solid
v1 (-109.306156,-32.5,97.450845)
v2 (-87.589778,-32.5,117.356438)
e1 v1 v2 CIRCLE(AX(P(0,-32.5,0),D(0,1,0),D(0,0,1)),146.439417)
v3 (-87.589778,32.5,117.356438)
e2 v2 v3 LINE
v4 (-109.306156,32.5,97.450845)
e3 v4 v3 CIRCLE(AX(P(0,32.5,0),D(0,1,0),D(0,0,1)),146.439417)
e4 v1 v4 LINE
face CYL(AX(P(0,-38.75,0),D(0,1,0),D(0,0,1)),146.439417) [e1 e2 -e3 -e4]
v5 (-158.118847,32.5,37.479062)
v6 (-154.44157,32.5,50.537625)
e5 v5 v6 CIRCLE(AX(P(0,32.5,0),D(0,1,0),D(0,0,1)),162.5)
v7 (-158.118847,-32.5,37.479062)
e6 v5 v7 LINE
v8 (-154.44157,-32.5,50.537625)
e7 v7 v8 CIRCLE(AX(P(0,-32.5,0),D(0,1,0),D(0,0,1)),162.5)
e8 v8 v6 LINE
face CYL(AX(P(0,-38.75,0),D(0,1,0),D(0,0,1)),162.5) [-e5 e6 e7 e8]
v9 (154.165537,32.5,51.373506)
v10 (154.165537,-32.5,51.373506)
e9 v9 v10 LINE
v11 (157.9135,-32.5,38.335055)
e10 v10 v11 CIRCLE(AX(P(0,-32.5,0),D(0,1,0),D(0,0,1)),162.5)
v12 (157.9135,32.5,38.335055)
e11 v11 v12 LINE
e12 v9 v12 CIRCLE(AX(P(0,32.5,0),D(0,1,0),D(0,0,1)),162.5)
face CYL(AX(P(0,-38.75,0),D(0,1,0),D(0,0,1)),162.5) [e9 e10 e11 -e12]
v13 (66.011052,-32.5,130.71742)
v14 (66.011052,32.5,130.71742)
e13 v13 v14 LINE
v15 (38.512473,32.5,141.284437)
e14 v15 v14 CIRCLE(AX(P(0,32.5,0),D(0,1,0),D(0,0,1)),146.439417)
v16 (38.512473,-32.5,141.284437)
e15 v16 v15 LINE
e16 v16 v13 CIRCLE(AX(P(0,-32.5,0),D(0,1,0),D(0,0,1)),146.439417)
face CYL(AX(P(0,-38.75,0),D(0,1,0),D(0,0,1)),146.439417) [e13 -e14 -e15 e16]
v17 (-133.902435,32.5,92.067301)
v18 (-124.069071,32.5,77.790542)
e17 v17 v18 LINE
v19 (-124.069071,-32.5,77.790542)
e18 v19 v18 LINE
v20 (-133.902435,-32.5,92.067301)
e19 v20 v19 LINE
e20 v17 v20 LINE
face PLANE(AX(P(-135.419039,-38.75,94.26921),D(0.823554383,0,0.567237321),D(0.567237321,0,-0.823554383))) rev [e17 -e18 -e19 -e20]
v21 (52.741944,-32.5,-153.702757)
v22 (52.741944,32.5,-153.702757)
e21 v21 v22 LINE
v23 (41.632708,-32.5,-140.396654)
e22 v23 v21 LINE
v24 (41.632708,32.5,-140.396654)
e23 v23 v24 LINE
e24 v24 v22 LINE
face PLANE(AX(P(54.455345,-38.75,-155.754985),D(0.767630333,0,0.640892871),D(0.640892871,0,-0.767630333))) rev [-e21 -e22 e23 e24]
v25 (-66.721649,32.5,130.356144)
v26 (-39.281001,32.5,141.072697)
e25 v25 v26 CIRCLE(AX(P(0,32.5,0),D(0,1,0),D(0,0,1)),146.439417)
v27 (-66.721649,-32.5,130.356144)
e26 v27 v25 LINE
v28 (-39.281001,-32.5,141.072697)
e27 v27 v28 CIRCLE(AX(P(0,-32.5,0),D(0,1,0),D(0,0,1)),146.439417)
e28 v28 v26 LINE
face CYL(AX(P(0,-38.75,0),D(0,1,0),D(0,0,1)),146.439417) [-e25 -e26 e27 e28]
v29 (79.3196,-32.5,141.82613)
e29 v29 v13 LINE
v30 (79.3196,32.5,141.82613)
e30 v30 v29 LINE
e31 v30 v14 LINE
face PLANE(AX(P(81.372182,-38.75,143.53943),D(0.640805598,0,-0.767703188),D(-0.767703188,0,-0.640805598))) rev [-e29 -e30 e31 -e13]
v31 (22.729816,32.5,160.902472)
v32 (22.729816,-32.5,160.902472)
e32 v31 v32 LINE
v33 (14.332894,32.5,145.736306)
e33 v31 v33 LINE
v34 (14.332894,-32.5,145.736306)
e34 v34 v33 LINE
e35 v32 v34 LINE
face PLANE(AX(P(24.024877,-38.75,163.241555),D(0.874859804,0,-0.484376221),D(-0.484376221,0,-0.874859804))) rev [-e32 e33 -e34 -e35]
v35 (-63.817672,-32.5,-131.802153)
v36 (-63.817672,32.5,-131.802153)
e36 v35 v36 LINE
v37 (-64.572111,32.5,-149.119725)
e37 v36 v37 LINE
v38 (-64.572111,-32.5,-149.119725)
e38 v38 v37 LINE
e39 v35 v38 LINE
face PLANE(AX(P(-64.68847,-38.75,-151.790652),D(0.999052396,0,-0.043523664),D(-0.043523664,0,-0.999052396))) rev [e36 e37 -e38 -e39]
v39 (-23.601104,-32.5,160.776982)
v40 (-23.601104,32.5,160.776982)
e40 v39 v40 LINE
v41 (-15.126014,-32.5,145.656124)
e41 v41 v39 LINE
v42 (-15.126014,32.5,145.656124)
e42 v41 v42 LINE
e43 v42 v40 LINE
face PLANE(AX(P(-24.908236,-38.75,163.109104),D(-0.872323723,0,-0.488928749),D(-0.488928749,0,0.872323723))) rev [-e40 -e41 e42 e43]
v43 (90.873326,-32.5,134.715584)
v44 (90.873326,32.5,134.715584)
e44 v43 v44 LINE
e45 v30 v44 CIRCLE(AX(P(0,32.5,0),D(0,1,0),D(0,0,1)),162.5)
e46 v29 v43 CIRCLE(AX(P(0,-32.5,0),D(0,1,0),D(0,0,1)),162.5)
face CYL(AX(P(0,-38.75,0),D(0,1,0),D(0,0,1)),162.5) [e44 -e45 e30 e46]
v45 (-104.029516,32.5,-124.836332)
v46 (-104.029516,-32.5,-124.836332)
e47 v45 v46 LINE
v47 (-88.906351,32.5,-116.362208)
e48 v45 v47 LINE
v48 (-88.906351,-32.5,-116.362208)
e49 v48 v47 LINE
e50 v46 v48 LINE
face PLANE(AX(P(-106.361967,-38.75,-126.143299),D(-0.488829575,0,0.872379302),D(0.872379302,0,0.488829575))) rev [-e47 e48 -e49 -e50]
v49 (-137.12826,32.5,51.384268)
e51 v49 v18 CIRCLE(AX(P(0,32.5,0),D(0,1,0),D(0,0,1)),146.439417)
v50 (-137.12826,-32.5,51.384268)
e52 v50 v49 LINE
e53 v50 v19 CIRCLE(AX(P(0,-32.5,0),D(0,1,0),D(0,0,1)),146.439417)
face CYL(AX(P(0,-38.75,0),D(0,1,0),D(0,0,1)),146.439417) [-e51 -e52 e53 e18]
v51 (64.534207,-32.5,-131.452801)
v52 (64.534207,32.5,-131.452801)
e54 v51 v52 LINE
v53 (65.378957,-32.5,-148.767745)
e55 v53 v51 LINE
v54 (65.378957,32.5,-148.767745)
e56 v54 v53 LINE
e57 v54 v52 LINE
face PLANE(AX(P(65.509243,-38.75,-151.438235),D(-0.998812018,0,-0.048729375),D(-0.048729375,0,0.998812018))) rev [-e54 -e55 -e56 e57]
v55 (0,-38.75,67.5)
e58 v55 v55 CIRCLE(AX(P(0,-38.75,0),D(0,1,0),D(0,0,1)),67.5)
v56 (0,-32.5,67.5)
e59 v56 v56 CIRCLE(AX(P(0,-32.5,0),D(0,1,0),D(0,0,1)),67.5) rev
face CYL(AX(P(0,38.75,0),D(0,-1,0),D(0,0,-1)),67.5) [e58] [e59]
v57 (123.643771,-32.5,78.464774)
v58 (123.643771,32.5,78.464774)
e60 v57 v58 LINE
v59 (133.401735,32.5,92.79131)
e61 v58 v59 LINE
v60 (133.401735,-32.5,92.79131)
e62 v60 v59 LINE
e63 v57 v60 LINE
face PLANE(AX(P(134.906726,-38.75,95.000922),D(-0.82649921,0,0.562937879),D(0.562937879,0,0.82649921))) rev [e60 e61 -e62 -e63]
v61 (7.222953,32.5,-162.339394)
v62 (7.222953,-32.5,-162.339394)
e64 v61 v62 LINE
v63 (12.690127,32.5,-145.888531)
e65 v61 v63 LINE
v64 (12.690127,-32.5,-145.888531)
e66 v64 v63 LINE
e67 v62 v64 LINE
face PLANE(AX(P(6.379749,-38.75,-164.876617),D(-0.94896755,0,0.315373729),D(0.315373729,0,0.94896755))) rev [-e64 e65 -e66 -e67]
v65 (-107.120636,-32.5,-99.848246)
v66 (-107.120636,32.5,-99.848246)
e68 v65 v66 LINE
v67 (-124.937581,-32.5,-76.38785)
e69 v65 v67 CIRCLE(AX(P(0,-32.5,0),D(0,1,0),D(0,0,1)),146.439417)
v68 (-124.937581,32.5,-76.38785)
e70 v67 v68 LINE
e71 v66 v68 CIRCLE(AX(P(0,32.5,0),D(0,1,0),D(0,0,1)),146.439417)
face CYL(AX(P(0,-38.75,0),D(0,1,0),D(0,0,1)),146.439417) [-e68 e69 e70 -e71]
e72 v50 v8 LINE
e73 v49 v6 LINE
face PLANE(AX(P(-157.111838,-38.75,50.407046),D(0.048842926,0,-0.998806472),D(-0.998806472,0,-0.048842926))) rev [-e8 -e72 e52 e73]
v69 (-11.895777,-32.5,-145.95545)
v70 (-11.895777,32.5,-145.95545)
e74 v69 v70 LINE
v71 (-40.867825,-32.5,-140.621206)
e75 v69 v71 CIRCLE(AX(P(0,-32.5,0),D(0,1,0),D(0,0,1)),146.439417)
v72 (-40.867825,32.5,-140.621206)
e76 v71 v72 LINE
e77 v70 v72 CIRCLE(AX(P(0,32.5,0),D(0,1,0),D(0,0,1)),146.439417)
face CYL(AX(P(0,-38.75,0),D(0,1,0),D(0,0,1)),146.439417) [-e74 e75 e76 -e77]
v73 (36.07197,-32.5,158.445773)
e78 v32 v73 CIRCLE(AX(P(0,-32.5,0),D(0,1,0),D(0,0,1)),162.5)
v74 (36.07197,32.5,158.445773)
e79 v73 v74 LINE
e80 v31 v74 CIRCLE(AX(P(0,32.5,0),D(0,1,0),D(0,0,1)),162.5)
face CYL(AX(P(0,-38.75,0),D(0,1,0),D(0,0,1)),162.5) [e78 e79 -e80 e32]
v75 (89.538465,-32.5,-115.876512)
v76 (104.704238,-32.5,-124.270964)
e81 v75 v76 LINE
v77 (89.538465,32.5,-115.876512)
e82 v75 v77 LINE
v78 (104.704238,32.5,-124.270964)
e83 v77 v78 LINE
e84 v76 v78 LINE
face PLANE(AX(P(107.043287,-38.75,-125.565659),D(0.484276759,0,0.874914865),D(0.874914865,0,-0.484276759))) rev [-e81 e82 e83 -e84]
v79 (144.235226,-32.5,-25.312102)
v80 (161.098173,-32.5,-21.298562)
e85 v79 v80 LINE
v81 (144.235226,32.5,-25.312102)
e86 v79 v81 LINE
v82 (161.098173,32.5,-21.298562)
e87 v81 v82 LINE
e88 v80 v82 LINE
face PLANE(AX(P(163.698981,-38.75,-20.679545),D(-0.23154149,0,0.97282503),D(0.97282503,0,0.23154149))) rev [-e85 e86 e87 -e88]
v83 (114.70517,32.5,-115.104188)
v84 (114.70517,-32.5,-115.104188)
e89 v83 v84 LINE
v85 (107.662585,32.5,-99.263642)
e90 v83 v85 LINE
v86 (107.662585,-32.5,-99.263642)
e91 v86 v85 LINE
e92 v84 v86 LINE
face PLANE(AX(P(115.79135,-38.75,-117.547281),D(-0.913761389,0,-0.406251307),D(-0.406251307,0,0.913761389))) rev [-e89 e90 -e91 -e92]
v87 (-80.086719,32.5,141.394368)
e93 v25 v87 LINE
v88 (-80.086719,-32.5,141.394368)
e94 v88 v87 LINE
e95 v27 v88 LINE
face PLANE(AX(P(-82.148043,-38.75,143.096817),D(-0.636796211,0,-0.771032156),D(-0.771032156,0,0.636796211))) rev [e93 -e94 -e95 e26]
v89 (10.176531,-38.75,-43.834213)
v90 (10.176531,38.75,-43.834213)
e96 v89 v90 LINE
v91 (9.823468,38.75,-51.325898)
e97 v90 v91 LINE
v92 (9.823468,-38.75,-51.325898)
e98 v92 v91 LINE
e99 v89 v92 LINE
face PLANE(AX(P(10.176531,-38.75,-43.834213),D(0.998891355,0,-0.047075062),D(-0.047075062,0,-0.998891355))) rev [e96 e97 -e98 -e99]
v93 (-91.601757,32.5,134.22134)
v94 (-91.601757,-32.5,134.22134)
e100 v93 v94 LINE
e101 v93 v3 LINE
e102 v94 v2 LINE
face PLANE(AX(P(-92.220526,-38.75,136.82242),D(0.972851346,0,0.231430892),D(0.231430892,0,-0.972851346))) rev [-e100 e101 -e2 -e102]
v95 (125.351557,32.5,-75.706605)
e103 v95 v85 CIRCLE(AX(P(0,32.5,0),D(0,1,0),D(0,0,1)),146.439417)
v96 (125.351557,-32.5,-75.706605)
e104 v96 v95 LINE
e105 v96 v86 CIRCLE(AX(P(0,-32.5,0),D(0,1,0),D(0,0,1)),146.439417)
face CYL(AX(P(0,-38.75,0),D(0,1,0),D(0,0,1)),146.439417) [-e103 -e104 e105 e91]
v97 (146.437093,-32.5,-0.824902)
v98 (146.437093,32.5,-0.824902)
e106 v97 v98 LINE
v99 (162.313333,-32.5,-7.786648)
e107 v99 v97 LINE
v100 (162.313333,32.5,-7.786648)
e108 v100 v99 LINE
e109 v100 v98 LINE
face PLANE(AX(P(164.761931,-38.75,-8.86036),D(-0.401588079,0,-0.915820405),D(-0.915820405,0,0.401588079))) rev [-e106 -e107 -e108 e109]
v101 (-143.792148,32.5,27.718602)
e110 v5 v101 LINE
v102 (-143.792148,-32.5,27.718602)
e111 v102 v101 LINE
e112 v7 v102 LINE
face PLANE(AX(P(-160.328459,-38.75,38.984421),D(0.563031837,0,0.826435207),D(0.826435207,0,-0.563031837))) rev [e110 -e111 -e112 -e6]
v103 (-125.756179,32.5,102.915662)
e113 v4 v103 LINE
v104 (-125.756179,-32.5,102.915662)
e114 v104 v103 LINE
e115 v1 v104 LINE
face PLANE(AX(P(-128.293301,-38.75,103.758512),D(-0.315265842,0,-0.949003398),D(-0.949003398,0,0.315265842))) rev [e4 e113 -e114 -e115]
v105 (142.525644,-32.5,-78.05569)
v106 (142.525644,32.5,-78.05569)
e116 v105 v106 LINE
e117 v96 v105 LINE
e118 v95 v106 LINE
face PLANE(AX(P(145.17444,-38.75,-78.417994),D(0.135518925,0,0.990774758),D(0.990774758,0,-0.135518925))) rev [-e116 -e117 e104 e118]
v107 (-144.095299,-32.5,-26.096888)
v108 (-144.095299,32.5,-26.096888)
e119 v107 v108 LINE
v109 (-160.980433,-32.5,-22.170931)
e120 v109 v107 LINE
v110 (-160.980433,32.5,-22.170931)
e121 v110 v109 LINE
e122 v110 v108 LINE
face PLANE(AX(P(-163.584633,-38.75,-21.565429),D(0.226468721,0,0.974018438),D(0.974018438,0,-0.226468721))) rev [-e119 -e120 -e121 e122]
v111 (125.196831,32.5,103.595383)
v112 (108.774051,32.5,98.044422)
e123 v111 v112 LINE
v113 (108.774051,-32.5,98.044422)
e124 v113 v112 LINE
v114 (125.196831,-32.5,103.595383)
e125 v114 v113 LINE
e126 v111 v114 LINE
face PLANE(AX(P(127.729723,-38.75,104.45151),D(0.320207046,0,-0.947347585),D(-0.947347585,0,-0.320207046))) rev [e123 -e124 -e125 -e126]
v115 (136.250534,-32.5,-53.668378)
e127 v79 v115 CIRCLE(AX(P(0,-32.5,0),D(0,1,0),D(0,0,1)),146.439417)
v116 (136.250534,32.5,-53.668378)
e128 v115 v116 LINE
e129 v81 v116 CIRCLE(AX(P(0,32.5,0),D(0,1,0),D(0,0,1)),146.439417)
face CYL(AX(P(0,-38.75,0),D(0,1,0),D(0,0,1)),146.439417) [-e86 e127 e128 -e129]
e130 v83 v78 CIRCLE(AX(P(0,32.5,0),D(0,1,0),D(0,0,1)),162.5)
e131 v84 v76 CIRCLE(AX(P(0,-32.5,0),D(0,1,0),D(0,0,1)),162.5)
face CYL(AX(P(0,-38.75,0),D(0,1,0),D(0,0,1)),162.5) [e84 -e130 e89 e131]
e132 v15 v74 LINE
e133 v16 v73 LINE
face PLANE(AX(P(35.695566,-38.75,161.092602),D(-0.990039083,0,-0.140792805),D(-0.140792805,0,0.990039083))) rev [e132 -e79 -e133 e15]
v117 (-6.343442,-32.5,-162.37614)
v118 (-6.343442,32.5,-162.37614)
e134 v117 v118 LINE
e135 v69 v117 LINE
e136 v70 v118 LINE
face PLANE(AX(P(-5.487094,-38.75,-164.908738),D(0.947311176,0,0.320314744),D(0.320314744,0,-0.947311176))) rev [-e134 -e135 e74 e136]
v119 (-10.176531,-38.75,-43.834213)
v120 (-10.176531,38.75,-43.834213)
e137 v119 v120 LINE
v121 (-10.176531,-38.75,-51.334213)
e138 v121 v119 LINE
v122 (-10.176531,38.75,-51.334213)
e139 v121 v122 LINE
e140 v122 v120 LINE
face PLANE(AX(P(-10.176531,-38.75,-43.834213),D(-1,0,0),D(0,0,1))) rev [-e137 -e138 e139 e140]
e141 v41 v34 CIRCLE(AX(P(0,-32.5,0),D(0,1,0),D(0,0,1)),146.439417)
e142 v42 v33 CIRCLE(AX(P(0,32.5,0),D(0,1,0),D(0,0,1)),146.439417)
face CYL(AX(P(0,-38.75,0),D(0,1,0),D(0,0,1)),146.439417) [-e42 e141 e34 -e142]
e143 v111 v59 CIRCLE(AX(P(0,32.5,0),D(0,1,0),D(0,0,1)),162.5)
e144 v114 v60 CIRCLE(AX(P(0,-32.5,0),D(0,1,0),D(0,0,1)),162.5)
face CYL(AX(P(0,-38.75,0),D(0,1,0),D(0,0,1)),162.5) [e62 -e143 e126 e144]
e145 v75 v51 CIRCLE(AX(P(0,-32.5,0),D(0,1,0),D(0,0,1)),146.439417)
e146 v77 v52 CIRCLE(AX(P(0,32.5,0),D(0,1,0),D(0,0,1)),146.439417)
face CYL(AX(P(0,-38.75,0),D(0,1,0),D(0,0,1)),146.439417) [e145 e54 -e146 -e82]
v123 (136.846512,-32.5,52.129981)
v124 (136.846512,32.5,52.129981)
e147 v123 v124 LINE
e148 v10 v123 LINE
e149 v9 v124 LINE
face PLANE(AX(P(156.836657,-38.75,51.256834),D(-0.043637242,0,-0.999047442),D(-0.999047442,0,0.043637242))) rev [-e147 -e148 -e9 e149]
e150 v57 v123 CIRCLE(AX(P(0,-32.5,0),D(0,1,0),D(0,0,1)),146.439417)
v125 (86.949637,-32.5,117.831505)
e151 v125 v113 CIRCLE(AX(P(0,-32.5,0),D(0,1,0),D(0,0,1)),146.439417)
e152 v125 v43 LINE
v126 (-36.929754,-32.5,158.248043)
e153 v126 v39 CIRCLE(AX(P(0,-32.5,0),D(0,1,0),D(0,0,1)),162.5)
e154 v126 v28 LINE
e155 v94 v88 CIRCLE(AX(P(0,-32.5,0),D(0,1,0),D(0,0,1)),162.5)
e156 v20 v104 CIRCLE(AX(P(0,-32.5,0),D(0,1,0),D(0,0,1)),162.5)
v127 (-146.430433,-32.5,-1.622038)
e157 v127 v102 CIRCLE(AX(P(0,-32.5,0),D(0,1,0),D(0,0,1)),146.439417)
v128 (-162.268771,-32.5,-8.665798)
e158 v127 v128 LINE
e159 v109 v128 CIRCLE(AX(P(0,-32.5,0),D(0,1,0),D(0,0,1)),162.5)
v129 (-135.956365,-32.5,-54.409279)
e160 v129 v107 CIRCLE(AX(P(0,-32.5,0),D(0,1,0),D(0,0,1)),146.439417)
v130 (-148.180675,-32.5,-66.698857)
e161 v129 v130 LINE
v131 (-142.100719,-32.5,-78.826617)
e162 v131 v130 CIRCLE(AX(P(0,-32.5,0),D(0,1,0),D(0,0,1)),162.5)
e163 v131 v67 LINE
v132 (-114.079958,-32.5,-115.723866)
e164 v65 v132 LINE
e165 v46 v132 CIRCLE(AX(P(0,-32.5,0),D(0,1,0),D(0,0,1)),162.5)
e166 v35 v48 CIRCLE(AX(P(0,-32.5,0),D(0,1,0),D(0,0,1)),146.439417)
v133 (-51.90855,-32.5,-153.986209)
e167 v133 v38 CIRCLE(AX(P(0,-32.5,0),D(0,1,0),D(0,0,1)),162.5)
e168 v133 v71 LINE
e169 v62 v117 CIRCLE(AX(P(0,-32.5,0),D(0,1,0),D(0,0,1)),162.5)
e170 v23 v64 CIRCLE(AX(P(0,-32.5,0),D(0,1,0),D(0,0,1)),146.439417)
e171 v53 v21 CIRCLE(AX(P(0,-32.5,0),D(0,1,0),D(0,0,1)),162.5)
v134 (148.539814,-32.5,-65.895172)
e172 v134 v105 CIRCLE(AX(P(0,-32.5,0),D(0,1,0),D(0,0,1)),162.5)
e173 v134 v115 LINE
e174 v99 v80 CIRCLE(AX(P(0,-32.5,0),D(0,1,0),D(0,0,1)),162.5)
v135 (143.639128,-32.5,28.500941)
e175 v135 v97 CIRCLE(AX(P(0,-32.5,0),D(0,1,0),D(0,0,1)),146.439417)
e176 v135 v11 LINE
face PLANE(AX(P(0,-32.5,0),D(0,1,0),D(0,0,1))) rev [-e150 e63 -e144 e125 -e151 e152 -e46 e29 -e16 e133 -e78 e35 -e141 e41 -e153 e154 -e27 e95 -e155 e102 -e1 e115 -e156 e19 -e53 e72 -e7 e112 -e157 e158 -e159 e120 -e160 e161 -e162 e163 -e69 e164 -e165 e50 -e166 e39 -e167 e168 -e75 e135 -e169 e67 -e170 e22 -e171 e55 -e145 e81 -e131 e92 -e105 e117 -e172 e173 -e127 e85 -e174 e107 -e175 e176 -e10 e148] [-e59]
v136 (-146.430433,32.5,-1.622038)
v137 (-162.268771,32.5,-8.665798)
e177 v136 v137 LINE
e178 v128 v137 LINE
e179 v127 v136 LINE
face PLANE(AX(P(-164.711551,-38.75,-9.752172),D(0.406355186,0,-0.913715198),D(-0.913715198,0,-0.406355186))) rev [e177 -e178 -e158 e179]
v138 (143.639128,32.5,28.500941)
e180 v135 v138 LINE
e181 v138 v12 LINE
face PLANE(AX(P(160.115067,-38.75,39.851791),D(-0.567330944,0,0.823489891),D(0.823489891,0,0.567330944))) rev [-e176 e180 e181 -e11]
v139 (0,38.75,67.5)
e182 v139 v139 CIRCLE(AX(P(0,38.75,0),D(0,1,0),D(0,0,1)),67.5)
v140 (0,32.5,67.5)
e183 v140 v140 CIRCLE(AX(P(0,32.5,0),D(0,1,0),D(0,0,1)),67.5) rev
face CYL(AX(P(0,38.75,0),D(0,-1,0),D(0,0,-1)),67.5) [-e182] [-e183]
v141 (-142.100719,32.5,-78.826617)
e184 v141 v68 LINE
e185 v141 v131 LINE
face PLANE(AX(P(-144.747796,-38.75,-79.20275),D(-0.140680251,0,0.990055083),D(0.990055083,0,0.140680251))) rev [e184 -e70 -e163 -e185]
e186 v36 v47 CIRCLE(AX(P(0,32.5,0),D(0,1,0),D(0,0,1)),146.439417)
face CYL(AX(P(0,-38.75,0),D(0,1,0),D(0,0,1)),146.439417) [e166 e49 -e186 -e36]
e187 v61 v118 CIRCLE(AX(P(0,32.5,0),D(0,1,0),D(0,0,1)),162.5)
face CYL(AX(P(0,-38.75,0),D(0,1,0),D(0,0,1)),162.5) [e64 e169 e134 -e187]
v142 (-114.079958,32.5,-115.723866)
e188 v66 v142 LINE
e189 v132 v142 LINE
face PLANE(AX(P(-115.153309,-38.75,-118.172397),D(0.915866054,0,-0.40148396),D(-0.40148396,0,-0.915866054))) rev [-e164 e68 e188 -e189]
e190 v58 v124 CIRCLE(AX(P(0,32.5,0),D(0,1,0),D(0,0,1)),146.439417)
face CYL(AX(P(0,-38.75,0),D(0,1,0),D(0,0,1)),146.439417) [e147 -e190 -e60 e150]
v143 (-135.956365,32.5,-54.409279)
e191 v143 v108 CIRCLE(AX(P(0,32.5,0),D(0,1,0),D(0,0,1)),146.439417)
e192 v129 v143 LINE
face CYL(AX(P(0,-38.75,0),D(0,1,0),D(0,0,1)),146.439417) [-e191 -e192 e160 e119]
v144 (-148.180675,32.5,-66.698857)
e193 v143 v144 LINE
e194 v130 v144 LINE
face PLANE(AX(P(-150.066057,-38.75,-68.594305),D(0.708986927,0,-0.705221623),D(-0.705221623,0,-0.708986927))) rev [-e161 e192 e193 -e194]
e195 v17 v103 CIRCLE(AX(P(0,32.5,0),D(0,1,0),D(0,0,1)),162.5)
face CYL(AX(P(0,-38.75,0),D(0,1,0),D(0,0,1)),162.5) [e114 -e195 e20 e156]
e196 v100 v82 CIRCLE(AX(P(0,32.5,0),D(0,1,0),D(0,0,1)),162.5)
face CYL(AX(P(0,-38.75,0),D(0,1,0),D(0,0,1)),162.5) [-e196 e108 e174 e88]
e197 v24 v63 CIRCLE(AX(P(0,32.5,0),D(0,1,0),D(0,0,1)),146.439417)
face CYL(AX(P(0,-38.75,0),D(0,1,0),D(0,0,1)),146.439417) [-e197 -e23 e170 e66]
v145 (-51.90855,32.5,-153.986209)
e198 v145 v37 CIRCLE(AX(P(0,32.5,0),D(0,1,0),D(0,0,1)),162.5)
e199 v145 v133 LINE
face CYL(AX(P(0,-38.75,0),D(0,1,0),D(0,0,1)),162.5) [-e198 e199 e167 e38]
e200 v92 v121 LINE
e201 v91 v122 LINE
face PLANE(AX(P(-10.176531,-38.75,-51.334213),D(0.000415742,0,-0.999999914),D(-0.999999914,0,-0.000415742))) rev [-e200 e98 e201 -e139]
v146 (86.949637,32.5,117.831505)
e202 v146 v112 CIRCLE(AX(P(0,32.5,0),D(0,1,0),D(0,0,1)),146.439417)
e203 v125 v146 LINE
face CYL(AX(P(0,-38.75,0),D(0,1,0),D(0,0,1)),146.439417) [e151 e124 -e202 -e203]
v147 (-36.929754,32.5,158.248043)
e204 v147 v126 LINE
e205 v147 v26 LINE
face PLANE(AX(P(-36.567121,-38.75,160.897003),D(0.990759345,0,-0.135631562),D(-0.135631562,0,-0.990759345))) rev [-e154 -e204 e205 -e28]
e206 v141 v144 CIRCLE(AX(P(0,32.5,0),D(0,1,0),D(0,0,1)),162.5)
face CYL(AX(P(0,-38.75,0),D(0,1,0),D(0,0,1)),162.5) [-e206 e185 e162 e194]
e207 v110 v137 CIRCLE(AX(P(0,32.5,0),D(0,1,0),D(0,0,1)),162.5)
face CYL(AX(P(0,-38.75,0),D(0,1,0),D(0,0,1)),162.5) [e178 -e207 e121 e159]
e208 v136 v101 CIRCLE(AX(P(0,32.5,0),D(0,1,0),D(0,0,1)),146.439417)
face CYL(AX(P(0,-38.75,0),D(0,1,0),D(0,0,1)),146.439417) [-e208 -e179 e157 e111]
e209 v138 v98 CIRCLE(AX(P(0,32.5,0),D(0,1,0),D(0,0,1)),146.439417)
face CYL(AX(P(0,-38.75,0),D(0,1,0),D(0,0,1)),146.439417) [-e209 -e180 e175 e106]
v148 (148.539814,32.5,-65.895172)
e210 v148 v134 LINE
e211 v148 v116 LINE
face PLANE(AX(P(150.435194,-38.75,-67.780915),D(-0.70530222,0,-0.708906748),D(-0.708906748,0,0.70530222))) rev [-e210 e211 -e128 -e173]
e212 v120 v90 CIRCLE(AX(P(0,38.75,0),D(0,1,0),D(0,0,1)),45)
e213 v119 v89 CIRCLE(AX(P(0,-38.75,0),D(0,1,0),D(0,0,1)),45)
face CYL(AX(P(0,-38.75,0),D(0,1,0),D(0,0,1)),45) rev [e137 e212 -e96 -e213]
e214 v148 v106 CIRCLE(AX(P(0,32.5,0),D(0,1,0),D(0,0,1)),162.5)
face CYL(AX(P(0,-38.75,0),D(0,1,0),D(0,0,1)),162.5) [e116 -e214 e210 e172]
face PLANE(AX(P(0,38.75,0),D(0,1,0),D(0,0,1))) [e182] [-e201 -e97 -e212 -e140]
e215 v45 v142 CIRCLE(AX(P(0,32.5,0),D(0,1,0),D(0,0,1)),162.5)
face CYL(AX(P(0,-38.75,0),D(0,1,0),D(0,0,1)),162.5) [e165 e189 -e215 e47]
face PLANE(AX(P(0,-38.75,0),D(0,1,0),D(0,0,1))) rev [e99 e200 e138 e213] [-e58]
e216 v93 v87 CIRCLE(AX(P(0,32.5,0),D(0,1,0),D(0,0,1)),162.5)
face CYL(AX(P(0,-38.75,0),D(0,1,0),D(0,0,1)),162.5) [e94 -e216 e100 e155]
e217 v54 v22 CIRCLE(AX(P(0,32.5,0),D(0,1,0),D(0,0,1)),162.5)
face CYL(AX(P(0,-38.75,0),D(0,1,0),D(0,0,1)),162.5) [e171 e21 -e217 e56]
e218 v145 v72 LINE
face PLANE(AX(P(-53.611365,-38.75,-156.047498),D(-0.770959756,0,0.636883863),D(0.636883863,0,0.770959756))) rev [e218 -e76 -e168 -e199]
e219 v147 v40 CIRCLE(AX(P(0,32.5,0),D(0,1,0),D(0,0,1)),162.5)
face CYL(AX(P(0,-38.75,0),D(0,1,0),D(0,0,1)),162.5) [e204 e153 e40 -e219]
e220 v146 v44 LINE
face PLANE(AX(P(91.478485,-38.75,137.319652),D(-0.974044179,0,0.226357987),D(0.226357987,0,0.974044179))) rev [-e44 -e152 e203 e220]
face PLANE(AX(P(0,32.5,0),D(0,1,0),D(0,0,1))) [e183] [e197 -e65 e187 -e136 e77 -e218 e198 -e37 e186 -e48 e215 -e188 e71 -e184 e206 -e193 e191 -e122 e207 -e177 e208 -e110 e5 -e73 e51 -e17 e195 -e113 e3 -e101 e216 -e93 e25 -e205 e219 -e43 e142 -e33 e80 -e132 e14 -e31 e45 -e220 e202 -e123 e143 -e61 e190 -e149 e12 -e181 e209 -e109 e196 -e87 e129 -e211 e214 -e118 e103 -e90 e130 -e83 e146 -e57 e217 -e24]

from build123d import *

# Parameters (mm, degrees)
SKETCH3_R           = 165
BOSS_EXTRUDE1_DEPTH = 32.5
SKETCH5_R           = 67.5
BOSS_EXTRUDE2_DEPTH = 38.75
CUT_EXTRUDE1_DEPTH  = 77.5
CUT_EXTRUDE2_START  = -65
CUT_EXTRUDE2_DEPTH  = 65
CUT_EXTRUDE4_DEPTH  = 244.931170023
SKETCH10_R          = 165
SKETCH10_R_2        = 162.5
CUT_EXTRUDE5_DEPTH  = 244.819721335


# Read off the part's stored shape, not the designer's step: Cut-Extrude2
with BuildPart() as part:
    # Sketch3 → Boss-Extrude1 (new, symmetric)
    with BuildSketch(Plane(origin=(0, 0, 0), x_dir=(1, 0, 0), z_dir=(0, 1, 0))):
        with Locations(Location((0, 0, 0), (0, 0, 270))):
            Circle(SKETCH3_R)
    extrude(amount=BOSS_EXTRUDE1_DEPTH, both=True)

    # Sketch5 → Boss-Extrude2 (add, symmetric)
    with BuildSketch(Plane(origin=(0, 0, 0), x_dir=(1, 0, 0), z_dir=(0, 1, 0))):
        with Locations(Location((0, 0, 0), (0, 0, 270))):
            Circle(SKETCH5_R)
    extrude(amount=BOSS_EXTRUDE2_DEPTH, both=True)

    # Sketch6 → Cut-Extrude1 (cut)
    with BuildSketch(Plane(origin=(0, 38.75, 0), x_dir=(1, 0, 0), z_dir=(0, 1, 0))):
        with BuildLine():
            Line((-10.176530617, 43.834212946), (-10.176530617, 51.334212946))
            Line((-10.176530617, 51.334212946), (9.823467655, 51.325898107))
            Line((9.823467655, 51.325898107), (10.176530617, 43.834212946))
            ThreePointArc((10.176530617, 43.834212946), (0, -45), (-10.176530617, 43.834212946))
        make_face()
    extrude(amount=-CUT_EXTRUDE1_DEPTH, mode=Mode.SUBTRACT)

    # Cut-Extrude2 outline → Cut-Extrude2 (cut)
    with BuildSketch(Plane(origin=(0, 32.5, 0), x_dir=(1, 0, 0), z_dir=(0, 1, 0)).offset(CUT_EXTRUDE2_START)):
        with BuildLine():
            ThreePointArc((-144.901893855, -21.164686614), (-145.807749666, -13.586866441), (-146.317587116, -5.972143919))
            Line((-146.317587116, -5.972143919), (-164.906164085, 5.563905713))
            ThreePointArc((-164.906164085, 5.563905713), (-164.325820919, -14.900489227), (-161.215685462, -35.135491472))
            Line((-161.215685462, -35.135491472), (-144.901893855, -21.164686614))
        make_face()
        with BuildLine():
            ThreePointArc((-151.760503896, 64.759165043), (-158.611942136, 45.467040938), (-163.021553119, 25.474952768))
            Line((-163.021553119, 25.474952768), (-142.762558665, 32.609119058))
            ThreePointArc((-142.762558665, 32.609119058), (-140.869819667, 40.002458791), (-138.594473879, 47.287150608))
            Line((-138.594473879, 47.287150608), (-151.760503896, 64.759165043))
        make_face()
        with BuildLine():
            Line((-134.279699439, -58.424867317), (-155.780333037, -54.382789914))
            ThreePointArc((-155.780333037, -54.382789914), (-147.846587026, -73.255625755), (-137.636746156, -91.000692896))
            Line((-137.636746156, -91.000692896), (-127.471425351, -72.080084082))
            ThreePointArc((-127.471425351, -72.080084082), (-131.053535124, -65.341210074), (-134.279699439, -58.424867317))
        make_face()
        with BuildLine():
            ThreePointArc((-118.118746723, 115.208340291), (-131.476641669, 99.693995283), (-142.810456694, 82.644863475))
            Line((-142.810456694, 82.644863475), (-121.342348853, 81.978882508))
            ThreePointArc((-121.342348853, 81.978882508), (-116.906639936, 88.189230302), (-112.153408966, 94.160053418))
            Line((-112.153408966, 94.160053418), (-118.118746723, 115.208340291))
        make_face()
        with BuildLine():
            Line((-104.106594283, -102.98698864), (-125.615504804, -106.984788418))
            ThreePointArc((-125.615504804, -106.984788418), (-111.399852309, -121.717184101), (-95.46920161, -134.575746492))
            Line((-95.46920161, -134.575746492), (-92.82523451, -113.260666785))
            ThreePointArc((-92.82523451, -113.260666785), (-98.59981447, -108.270861218), (-104.106594283, -102.98698864))
        make_face()
        with BuildLine():
            ThreePointArc((-68.524398286, 150.097990791), (-86.584692207, 140.45672314), (-103.312016753, 128.653127418))
            Line((-103.312016753, 128.653127418), (-83.534182446, 120.276943615))
            ThreePointArc((-83.534182446, 120.276943615), (-77.154570678, 124.465557588), (-70.565404709, 128.316119255))
            Line((-70.565404709, 128.316119255), (-68.524398286, 150.097990791))
        make_face()
        with BuildLine():
            Line((-59.873316695, -133.640146477), (-78.485606588, -145.137898423))
            ThreePointArc((-78.485606588, -145.137898423), (-59.90795025, -153.740162277), (-40.408012374, -159.975599814))
            Line((-40.408012374, -159.975599814), (-45.642481386, -139.144768839))
            ThreePointArc((-45.642481386, -139.144768839), (-52.829642513, -136.577932604), (-59.873316695, -133.640146477))
        make_face()
        with BuildLine():
            ThreePointArc((-9.675450153, 164.716075913), (-29.99900028, 162.249992241), (-49.860716477, 157.286073612))
            Line((-49.860716477, 157.286073612), (-34.444261822, 142.330937009))
            ThreePointArc((-34.444261822, 142.330937009), (-26.982349124, 143.932121634), (-19.44715153, 145.142382162))
            Line((-19.44715153, 145.142382162), (-9.675450153, 164.716075913))
        make_face()
        with BuildLine():
            Line((-7.553815918, -146.244462006), (-20.755792298, -163.689331009))
            ThreePointArc((-20.755792298, -163.689331009), (-0.325147548, -164.999679633), (20.110502842, -163.769861927))
            Line((20.110502842, -163.769861927), (7.704541763, -146.236598834))
            ThreePointArc((7.704541763, -146.236598834), (0.075465406, -146.439397388), (-7.553815918, -146.244462006))
        make_face()
        with BuildLine():
            ThreePointArc((50.480221136, 157.08834226), (30.638222865, 162.130500831), (10.324549847, 164.676664013))
            Line((10.324549847, 164.676664013), (19.297547224, 145.162348677))
            ThreePointArc((19.297547224, 145.162348677), (26.833988195, 143.959855098), (34.297547224, 142.366362097))
            Line((34.297547224, 142.366362097), (50.480221136, 157.08834226))
        make_face()
        with BuildLine():
            Line((45.785869556, -139.097652573), (39.777206754, -160.133612408))
            ThreePointArc((39.777206754, -160.133612408), (59.301568133, -153.97507596), (77.912983213, -145.446096705))
            Line((77.912983213, -145.446096705), (60.011023855, -133.578365832))
            ThreePointArc((60.011023855, -133.578365832), (52.970381303, -136.523410106), (45.785869556, -139.097652573))
        make_face()
        with BuildLine():
            ThreePointArc((103.81825884, 128.244957528), (87.13758424, 140.114386888), (69.115428503, 149.826758434))
            Line((69.115428503, 149.826758434), (70.433115586, 128.388780784))
            ThreePointArc((70.433115586, 128.388780784), (77.026246716, 124.545012422), (83.410172176, 120.362975952))
            Line((83.410172176, 120.362975952), (103.81825884, 128.244957528))
        make_face()
        with BuildLine():
            Line((92.941919639, -113.164934393), (94.93807362, -134.950962121))
            ThreePointArc((94.93807362, -134.950962121), (110.919278435, -122.155285074), (125.192883471, -107.479030179))
            Line((125.192883471, -107.479030179), (104.212684643, -102.87963434))
            ThreePointArc((104.212684643, -102.87963434), (98.711353687, -108.169179786), (92.941919639, -113.164934393))
        make_face()
        with BuildLine():
            ThreePointArc((143.135065411, 82.081380652), (131.868532017, 99.175048594), (118.571885559, 114.741918909))
            Line((118.571885559, 114.741918909), (112.056301405, 94.275596619))
            ThreePointArc((112.056301405, 94.275596619), (116.815683801, 88.309675691), (121.257791184, 82.103902949))
            Line((121.257791184, 82.103902949), (143.135065411, 82.081380652))
        make_face()
        with BuildLine():
            Line((127.545648465, -71.948664755), (137.277027574, -91.54243661))
            ThreePointArc((137.277027574, -91.54243661), (147.55672556, -73.837746052), (155.564791098, -54.996325066))
            Line((155.564791098, -54.996325066), (134.339844907, -58.286438155))
            ThreePointArc((134.339844907, -58.286438155), (131.120810776, -65.206102351), (127.545648465, -71.948664755))
        make_face()
        with BuildLine():
            ThreePointArc((163.12068826, 24.83225849), (158.789903837, 44.84157044), (152.01455244, 64.160547429))
            Line((152.01455244, 64.160547429), (138.545662793, 47.429970732))
            ThreePointArc((138.545662793, 47.429970732), (140.82851549, 40.147627916), (142.72887358, 32.756242901))
            Line((142.72887358, 32.756242901), (163.12068826, 24.83225849))
        make_face()
        with BuildLine():
            Line((144.923630711, -21.015329261), (161.075958276, -35.770597781))
            ThreePointArc((161.075958276, -35.770597781), (164.265819258, -15.548010277), (164.926811673, 4.913938493))
            Line((164.926811673, 4.913938493), (146.323664713, -5.821335521))
            ThreePointArc((146.323664713, -5.821335521), (145.821675804, -13.436579474), (144.923630711, -21.015329261))
        make_face()
    extrude(amount=CUT_EXTRUDE2_DEPTH, mode=Mode.SUBTRACT)

    # Sketch9 → Cut-Extrude4 (cut, through all)
    with BuildSketch(Plane(origin=(0, 32.5, 0), x_dir=(1, 0, 0), z_dir=(0, 1, 0))):
        with BuildLine():
            Line((-5.487093592, 164.908737803), (-11.895777239, 145.955449663))
            ThreePointArc((-11.895777239, 145.955449663), (-15.676736447, 145.597880262), (-19.44715153, 145.142382162))
            Line((-19.44715153, 145.142382162), (-20.251209919, 147.961121018))
            Line((-20.251209919, 147.961121018), (-10.203781376, 165.845543824))
            Line((-10.203781376, 165.845543824), (-5.487093592, 164.908737803))
        make_face()
        with BuildLine():
            Line((6.379749343, 164.876616894), (12.690126804, 145.888531023))
            ThreePointArc((12.690126804, 145.888531023), (15.997957921, 145.56293534), (19.297547224, 145.162348677))
            Line((19.297547224, 145.162348677), (21.04372139, 145.888531023))
            Line((21.04372139, 145.888531023), (10.594395706, 165.845543824))
            Line((10.594395706, 165.845543824), (6.379749343, 164.876616894))
        make_face()
        with BuildLine():
            Line((34.566031027, 145.285217195), (34.297547224, 142.366362097))
            ThreePointArc((34.297547224, 142.366362097), (37.977899474, 141.429070399), (41.632707903, 140.396653931))
            Line((41.632707903, 140.396653931), (54.455344819, 155.754985219))
            Line((54.455344819, 155.754985219), (50.395577812, 158.332394972))
            Line((50.395577812, 158.332394972), (34.566031027, 145.285217195))
        make_face()
        with BuildLine():
            Line((65.509242895, 151.438235249), (64.534206856, 131.452801217))
            ThreePointArc((64.534206856, 131.452801217), (67.501048785, 129.95426586), (70.433115586, 128.388780784))
            Line((70.433115586, 128.388780784), (72.323701824, 128.43513479))
            Line((72.323701824, 128.43513479), (69.789300364, 150.819226829))
            Line((69.789300364, 150.819226829), (65.509242895, 151.438235249))
        make_face()
        with BuildLine():
            Line((84.714937945, 122.987739735), (83.410172176, 120.362975952))
            ThreePointArc((83.410172176, 120.362975952), (86.503409629, 118.159480893), (89.538465148, 115.876512121))
            Line((89.538465148, 115.876512121), (107.043287164, 125.565658813))
            Line((107.043287164, 125.565658813), (104.188734966, 129.435578829))
            Line((104.188734966, 129.435578829), (84.714937945, 122.987739735))
        make_face()
        with BuildLine():
            Line((115.791350195, 117.547280786), (107.662584677, 99.263642201))
            ThreePointArc((107.662584677, 99.263642201), (109.887748975, 96.794552675), (112.056301405, 94.275596619))
            Line((112.056301405, 94.275596619), (113.835965567, 93.635861919))
            Line((113.835965567, 93.635861919), (119.558773292, 115.423937533))
            Line((119.558773292, 115.423937533), (115.791350195, 117.547280786))
        make_face()
        with BuildLine():
            Line((123.422623072, 84.080086526), (121.257791184, 82.103902949))
            ThreePointArc((121.257791184, 82.103902949), (123.346154982, 78.931798748), (125.351556524, 75.706605255))
            Line((125.351556524, 75.706605255), (145.17444043, 78.417994401))
            Line((145.17444043, 78.417994401), (143.910626133, 83.057770538))
            Line((143.910626133, 83.057770538), (123.422623072, 84.080086526))
        make_face()
        with BuildLine():
            Line((150.435194029, 67.7809147), (136.250533858, 53.668378268))
            ThreePointArc((136.250533858, 53.668378268), (137.433499757, 50.562198793), (138.545662793, 47.429970732))
            Line((138.545662793, 47.429970732), (139.974051374, 46.190547043))
            Line((139.974051374, 46.190547043), (153.181171389, 64.440005886))
            Line((153.181171389, 64.440005886), (150.435194029, 67.7809147))
        make_face()
        with BuildLine():
            Line((145.461399045, 33.816951728), (142.72887358, 32.756242901))
            ThreePointArc((142.72887358, 32.756242901), (143.530318619, 29.043939806), (144.235225595, 25.312101845))
            Line((144.235225595, 25.312101845), (163.698981077, 20.679545316))
            Line((163.698981077, 20.679545316), (164.196589804, 25.462550097))
            Line((164.196589804, 25.462550097), (145.461399045, 33.816951728))
        make_face()
        with BuildLine():
            Line((164.761931319, 8.860360497), (146.437093451, 0.824902462))
            ThreePointArc((146.437093451, 0.824902462), (146.418094852, -2.49886021), (146.323664713, -5.821335521))
            Line((146.323664713, -5.821335521), (147.207865919, -7.493057163))
            Line((147.207865919, -7.493057163), (166.115603483, 4.753094371))
            Line((166.115603483, 4.753094371), (164.761931319, 8.860360497))
        make_face()
        with BuildLine():
            Line((147.854807047, -21.013349787), (144.923630711, -21.015329261))
            ThreePointArc((144.923630711, -21.015329261), (144.329917398, -24.766464144), (143.639128215, -28.500941179))
            Line((143.639128215, -28.500941179), (160.115067242, -39.851790953))
            Line((160.115067242, -39.851790953), (162.306894177, -35.571528828))
            Line((162.306894177, -35.571528828), (147.854807047, -21.013349787))
        make_face()
        with BuildLine():
            Line((156.836656807, -51.256834487), (136.846512137, -52.129980992))
            ThreePointArc((136.846512137, -52.129980992), (135.628114906, -55.222434295), (134.339844907, -58.286438155))
            Line((134.339844907, -58.286438155), (134.560442465, -60.164682478))
            Line((134.560442465, -60.164682478), (156.615202849, -55.575748877))
            Line((156.615202849, -55.575748877), (156.836656807, -51.256834487))
        make_face()
        with BuildLine():
            Line((130.279604066, -73.005681975), (127.545648465, -71.948664755))
            ThreePointArc((127.545648465, -71.948664755), (125.636961073, -75.232019877), (123.643770637, -78.464774167))
            Line((123.643770637, -78.464774167), (134.906726347, -95.000922028))
            Line((134.906726347, -95.000922028), (138.496753118, -91.801475676))
            Line((138.496753118, -91.801475676), (130.279604066, -73.005681975))
        make_face()
        with BuildLine():
            Line((127.729722731, -104.451509951), (108.774051067, -98.044421651))
            ThreePointArc((108.774051067, -98.044421651), (106.5208065, -100.487912631), (104.212684643, -102.87963434))
            Line((104.212684643, -102.87963434), (103.739885631, -104.710734041))
            Line((103.739885631, -104.710734041), (125.963051235, -108.398779284))
            Line((125.963051235, -108.398779284), (127.729722731, -104.451509951))
        make_face()
        with BuildLine():
            Line((95.109418652, -115.138192273), (92.941919639, -113.164934393))
            ThreePointArc((92.941919639, -113.164934393), (89.976036976, -115.53707445), (86.949636701, -117.831504616))
            Line((86.949636701, -117.831504616), (91.478484516, -137.319652165))
            Line((91.478484516, -137.319652165), (95.981858114, -135.633124544))
            Line((95.981858114, -135.633124544), (95.109418652, -115.138192273))
        make_face()
        with BuildLine():
            Line((81.372181826, -143.539430209), (66.011051662, -130.717419883))
            ThreePointArc((66.011051662, -130.717419883), (63.027272925, -132.181941543), (60.011023855, -133.578365832))
            Line((60.011023855, -133.578365832), (58.9086824, -135.115020749))
            Line((58.9086824, -135.115020749), (78.298891566, -146.58195389))
            Line((78.298891566, -146.58195389), (81.372181826, -143.539430209))
        make_face()
        with BuildLine():
            Line((47.094179229, -141.720651702), (45.785869556, -139.097652573))
            ThreePointArc((45.785869556, -139.097652573), (42.163350512, -140.238206905), (38.512472524, -141.284437439))
            Line((38.512472524, -141.284437439), (35.695566451, -161.092602362))
            Line((35.695566451, -161.092602362), (40.504081318, -161.146768373))
            Line((40.504081318, -161.146768373), (47.094179229, -141.720651702))
        make_face()
        with BuildLine():
            Line((24.024876866, -163.241555039), (14.332893951, -145.736306229))
            ThreePointArc((14.332893951, -145.736306229), (11.021556895, -146.024066804), (7.704541763, -146.236598834))
            Line((7.704541763, -146.236598834), (6.121535186, -147.271275207))
            Line((6.121535186, -147.271275207), (20.060032723, -164.968423384))
            Line((20.060032723, -164.968423384), (24.024876866, -163.241555039))
        make_face()
        with BuildLine():
            Line((-7.281390057, -149.162951818), (-7.553815918, -146.244462006))
            ThreePointArc((-7.553815918, -146.244462006), (-11.343730075, -145.999392431), (-15.126014473, -145.656124102))
            Line((-15.126014473, -145.656124102), (-24.908235659, -163.109103965))
            Line((-24.908235659, -163.109103965), (-20.443996102, -164.896648189))
            Line((-20.443996102, -164.896648189), (-7.281390057, -149.162951818))
        make_face()
        with BuildLine():
            Line((-36.56712084, -160.897003308), (-39.28100051, -141.072696867))
            ThreePointArc((-39.28100051, -141.072696867), (-42.472681466, -140.144832696), (-45.642481386, -139.144768839))
            Line((-45.642481386, -139.144768839), (-47.492359274, -139.53772789))
            Line((-47.492359274, -139.53772789), (-40.888044696, -161.074993179))
            Line((-40.888044696, -161.074993179), (-36.56712084, -160.897003308))
        make_face()
        with BuildLine():
            Line((-60.673567267, -136.45996875), (-59.873316695, -133.640146477))
            ThreePointArc((-59.873316695, -133.640146477), (-63.318777057, -132.042550999), (-66.721649399, -130.356144097))
            Line((-66.721649399, -130.356144097), (-82.148042522, -143.096817259))
            Line((-82.148042522, -143.096817259), (-78.630998563, -146.376321943))
            Line((-78.630998563, -146.376321943), (-60.673567267, -136.45996875))
        make_face()
        with BuildLine():
            Line((-92.220526252, -136.822419719), (-87.589778189, -117.356438082))
            ThreePointArc((-87.589778189, -117.356438082), (-90.230748846, -115.338262363), (-92.82523451, -113.260666785))
            Line((-92.82523451, -113.260666785), (-94.692147451, -112.958837216))
            Line((-94.692147451, -112.958837216), (-96.313965111, -135.427492597))
            Line((-96.313965111, -135.427492597), (-92.220526252, -136.822419719))
        make_face()
        with BuildLine():
            Line((-105.871443015, -105.327310752), (-104.106594283, -102.98698864))
            ThreePointArc((-104.106594283, -102.98698864), (-106.742272336, -100.252631382), (-109.306155856, -97.450844503))
            Line((-109.306155856, -97.450844503), (-128.293301045, -103.758512456))
            Line((-128.293301045, -103.758512456), (-126.19844896, -108.087062319))
            Line((-126.19844896, -108.087062319), (-105.871443015, -105.327310752))
        make_face()
        with BuildLine():
            Line((-135.419038582, -94.269210188), (-124.069070971, -77.790542039))
            ThreePointArc((-124.069070971, -77.790542039), (-125.802653609, -74.954620587), (-127.471425351, -72.080084082))
            Line((-127.471425351, -72.080084082), (-129.103236407, -71.124229649))
            Line((-129.103236407, -71.124229649), (-138.732150843, -91.489758711))
            Line((-138.732150843, -91.489758711), (-135.419038582, -94.269210188))
        make_face()
        with BuildLine():
            Line((-136.770793729, -59.969615797), (-134.279699439, -58.424867317))
            ThreePointArc((-134.279699439, -58.424867317), (-135.749632257, -54.923038377), (-137.128260278, -51.384268366))
            Line((-137.128260278, -51.384268366), (-157.111838364, -50.407045599))
            Line((-157.111838364, -50.407045599), (-156.722099534, -55.200045998))
            Line((-156.722099534, -55.200045998), (-136.770793729, -59.969615797))
        make_face()
        with BuildLine():
            Line((-160.328459369, -38.984421457), (-143.792148228, -27.718602242))
            ThreePointArc((-143.792148228, -27.718602242), (-144.384212905, -24.447941962), (-144.901893855, -21.164686614))
            Line((-144.901893855, -21.164686614), (-146.078217901, -19.683900756))
            Line((-146.078217901, -19.683900756), (-162.413790863, -35.195825949))
            Line((-162.413790863, -35.195825949), (-160.328459369, -38.984421457))
        make_face()
        with BuildLine():
            Line((-149.198490877, -6.512691927), (-146.317587116, -5.972143919))
            ThreePointArc((-146.317587116, -5.972143919), (-146.423252127, -2.1757847), (-146.430433296, 1.622037945))
            Line((-146.430433296, 1.622037945), (-164.711551324, 9.752172081))
            Line((-164.711551324, 9.752172081), (-166.07956214, 5.142042409))
            Line((-166.07956214, 5.142042409), (-149.198490877, -6.512691927))
        make_face()
        with BuildLine():
            Line((-163.584633307, 21.565429412), (-144.095299088, 26.096888382))
            ThreePointArc((-144.095299088, 26.096888382), (-143.465884188, 29.360566695), (-142.762558665, 32.609119058))
            Line((-142.762558665, 32.609119058), (-143.324526619, 34.414848007))
            Line((-143.324526619, 34.414848007), (-164.16054846, 25.851498135))
            Line((-164.16054846, 25.851498135), (-163.584633307, 21.565429412))
        make_face()
        with BuildLine():
            Line((-141.476105095, 47.823807077), (-138.594473879, 47.287150608))
            ThreePointArc((-138.594473879, 47.287150608), (-137.321600437, 50.865320757), (-135.956364898, 54.409279043))
            Line((-135.956364898, 54.409279043), (-150.066056581, 68.594304882))
            Line((-150.066056581, 68.594304882), (-153.007059599, 64.789669496))
            Line((-153.007059599, 64.789669496), (-141.476105095, 47.823807077))
        make_face()
        with BuildLine():
            Line((-144.747796064, 79.20274954), (-124.937581346, 76.387849622))
            ThreePointArc((-124.937581346, 76.387849622), (-123.171692839, 79.203768127), (-121.342348853, 81.978882508))
            Line((-121.342348853, 81.978882508), (-121.21406383, 83.865680847))
            Line((-121.21406383, 83.865680847), (-143.736514343, 83.407434147))
            Line((-143.736514343, 83.407434147), (-144.747796064, 79.20274954))
        make_face()
        with BuildLine():
            Line((-114.646587374, 95.701435934), (-112.153408966, 94.160053418))
            ThreePointArc((-112.153408966, 94.160053418), (-109.673905684, 97.036782791), (-107.120636061, 99.848245514))
            Line((-107.120636061, 99.848245514), (-115.153309351, 118.172396715))
            Line((-115.153309351, 118.172396715), (-119.270105819, 115.687092705))
            Line((-119.270105819, 115.687092705), (-114.646587374, 95.701435934))
        make_face()
        with BuildLine():
            Line((-106.361966886, 126.143299466), (-88.90635094, 116.362208491))
            ThreePointArc((-88.90635094, 116.362208491), (-86.242481854, 118.350061791), (-83.534182446, 120.276943615))
            Line((-83.534182446, 120.276943615), (-82.732970049, 121.989988773))
            Line((-82.732970049, 121.989988773), (-103.900067493, 129.698734002))
            Line((-103.900067493, 129.698734002), (-106.361966886, 126.143299466))
        make_face()
        with BuildLine():
            Line((-72.333412749, 130.654055568), (-70.565404709, 128.316119255))
            ThreePointArc((-70.565404709, 128.316119255), (-67.214142244, 130.10288961), (-63.817671747, 131.802153151))
            Line((-63.817671747, 131.802153151), (-64.688469607, 151.790651556))
            Line((-64.688469607, 151.790651556), (-69.425063349, 150.960333))
            Line((-69.425063349, 150.960333), (-72.333412749, 130.654055568))
        make_face()
        with BuildLine():
            Line((-53.611364709, 156.047497814), (-40.867825192, 140.621206318))
            ThreePointArc((-40.867825192, 140.621206318), (-37.665745809, 141.51252381), (-34.444261822, 142.330937009))
            Line((-34.444261822, 142.330937009), (-33.078330224, 143.638872746))
            Line((-33.078330224, 143.638872746), (-50.031340797, 158.473501143))
            Line((-50.031340797, 158.473501143), (-53.611364709, 156.047497814))
        make_face()
    extrude(amount=-CUT_EXTRUDE4_DEPTH, mode=Mode.SUBTRACT)

    # Sketch10 → Cut-Extrude5 (cut, through all)
    with BuildSketch(Plane(origin=(0, 32.5, 0), x_dir=(1, 0, 0), z_dir=(0, 1, 0))):
        Circle(SKETCH10_R)
        Circle(SKETCH10_R_2, mode=Mode.SUBTRACT)
    extrude(amount=-CUT_EXTRUDE5_DEPTH, mode=Mode.SUBTRACT)


solid = part.part
